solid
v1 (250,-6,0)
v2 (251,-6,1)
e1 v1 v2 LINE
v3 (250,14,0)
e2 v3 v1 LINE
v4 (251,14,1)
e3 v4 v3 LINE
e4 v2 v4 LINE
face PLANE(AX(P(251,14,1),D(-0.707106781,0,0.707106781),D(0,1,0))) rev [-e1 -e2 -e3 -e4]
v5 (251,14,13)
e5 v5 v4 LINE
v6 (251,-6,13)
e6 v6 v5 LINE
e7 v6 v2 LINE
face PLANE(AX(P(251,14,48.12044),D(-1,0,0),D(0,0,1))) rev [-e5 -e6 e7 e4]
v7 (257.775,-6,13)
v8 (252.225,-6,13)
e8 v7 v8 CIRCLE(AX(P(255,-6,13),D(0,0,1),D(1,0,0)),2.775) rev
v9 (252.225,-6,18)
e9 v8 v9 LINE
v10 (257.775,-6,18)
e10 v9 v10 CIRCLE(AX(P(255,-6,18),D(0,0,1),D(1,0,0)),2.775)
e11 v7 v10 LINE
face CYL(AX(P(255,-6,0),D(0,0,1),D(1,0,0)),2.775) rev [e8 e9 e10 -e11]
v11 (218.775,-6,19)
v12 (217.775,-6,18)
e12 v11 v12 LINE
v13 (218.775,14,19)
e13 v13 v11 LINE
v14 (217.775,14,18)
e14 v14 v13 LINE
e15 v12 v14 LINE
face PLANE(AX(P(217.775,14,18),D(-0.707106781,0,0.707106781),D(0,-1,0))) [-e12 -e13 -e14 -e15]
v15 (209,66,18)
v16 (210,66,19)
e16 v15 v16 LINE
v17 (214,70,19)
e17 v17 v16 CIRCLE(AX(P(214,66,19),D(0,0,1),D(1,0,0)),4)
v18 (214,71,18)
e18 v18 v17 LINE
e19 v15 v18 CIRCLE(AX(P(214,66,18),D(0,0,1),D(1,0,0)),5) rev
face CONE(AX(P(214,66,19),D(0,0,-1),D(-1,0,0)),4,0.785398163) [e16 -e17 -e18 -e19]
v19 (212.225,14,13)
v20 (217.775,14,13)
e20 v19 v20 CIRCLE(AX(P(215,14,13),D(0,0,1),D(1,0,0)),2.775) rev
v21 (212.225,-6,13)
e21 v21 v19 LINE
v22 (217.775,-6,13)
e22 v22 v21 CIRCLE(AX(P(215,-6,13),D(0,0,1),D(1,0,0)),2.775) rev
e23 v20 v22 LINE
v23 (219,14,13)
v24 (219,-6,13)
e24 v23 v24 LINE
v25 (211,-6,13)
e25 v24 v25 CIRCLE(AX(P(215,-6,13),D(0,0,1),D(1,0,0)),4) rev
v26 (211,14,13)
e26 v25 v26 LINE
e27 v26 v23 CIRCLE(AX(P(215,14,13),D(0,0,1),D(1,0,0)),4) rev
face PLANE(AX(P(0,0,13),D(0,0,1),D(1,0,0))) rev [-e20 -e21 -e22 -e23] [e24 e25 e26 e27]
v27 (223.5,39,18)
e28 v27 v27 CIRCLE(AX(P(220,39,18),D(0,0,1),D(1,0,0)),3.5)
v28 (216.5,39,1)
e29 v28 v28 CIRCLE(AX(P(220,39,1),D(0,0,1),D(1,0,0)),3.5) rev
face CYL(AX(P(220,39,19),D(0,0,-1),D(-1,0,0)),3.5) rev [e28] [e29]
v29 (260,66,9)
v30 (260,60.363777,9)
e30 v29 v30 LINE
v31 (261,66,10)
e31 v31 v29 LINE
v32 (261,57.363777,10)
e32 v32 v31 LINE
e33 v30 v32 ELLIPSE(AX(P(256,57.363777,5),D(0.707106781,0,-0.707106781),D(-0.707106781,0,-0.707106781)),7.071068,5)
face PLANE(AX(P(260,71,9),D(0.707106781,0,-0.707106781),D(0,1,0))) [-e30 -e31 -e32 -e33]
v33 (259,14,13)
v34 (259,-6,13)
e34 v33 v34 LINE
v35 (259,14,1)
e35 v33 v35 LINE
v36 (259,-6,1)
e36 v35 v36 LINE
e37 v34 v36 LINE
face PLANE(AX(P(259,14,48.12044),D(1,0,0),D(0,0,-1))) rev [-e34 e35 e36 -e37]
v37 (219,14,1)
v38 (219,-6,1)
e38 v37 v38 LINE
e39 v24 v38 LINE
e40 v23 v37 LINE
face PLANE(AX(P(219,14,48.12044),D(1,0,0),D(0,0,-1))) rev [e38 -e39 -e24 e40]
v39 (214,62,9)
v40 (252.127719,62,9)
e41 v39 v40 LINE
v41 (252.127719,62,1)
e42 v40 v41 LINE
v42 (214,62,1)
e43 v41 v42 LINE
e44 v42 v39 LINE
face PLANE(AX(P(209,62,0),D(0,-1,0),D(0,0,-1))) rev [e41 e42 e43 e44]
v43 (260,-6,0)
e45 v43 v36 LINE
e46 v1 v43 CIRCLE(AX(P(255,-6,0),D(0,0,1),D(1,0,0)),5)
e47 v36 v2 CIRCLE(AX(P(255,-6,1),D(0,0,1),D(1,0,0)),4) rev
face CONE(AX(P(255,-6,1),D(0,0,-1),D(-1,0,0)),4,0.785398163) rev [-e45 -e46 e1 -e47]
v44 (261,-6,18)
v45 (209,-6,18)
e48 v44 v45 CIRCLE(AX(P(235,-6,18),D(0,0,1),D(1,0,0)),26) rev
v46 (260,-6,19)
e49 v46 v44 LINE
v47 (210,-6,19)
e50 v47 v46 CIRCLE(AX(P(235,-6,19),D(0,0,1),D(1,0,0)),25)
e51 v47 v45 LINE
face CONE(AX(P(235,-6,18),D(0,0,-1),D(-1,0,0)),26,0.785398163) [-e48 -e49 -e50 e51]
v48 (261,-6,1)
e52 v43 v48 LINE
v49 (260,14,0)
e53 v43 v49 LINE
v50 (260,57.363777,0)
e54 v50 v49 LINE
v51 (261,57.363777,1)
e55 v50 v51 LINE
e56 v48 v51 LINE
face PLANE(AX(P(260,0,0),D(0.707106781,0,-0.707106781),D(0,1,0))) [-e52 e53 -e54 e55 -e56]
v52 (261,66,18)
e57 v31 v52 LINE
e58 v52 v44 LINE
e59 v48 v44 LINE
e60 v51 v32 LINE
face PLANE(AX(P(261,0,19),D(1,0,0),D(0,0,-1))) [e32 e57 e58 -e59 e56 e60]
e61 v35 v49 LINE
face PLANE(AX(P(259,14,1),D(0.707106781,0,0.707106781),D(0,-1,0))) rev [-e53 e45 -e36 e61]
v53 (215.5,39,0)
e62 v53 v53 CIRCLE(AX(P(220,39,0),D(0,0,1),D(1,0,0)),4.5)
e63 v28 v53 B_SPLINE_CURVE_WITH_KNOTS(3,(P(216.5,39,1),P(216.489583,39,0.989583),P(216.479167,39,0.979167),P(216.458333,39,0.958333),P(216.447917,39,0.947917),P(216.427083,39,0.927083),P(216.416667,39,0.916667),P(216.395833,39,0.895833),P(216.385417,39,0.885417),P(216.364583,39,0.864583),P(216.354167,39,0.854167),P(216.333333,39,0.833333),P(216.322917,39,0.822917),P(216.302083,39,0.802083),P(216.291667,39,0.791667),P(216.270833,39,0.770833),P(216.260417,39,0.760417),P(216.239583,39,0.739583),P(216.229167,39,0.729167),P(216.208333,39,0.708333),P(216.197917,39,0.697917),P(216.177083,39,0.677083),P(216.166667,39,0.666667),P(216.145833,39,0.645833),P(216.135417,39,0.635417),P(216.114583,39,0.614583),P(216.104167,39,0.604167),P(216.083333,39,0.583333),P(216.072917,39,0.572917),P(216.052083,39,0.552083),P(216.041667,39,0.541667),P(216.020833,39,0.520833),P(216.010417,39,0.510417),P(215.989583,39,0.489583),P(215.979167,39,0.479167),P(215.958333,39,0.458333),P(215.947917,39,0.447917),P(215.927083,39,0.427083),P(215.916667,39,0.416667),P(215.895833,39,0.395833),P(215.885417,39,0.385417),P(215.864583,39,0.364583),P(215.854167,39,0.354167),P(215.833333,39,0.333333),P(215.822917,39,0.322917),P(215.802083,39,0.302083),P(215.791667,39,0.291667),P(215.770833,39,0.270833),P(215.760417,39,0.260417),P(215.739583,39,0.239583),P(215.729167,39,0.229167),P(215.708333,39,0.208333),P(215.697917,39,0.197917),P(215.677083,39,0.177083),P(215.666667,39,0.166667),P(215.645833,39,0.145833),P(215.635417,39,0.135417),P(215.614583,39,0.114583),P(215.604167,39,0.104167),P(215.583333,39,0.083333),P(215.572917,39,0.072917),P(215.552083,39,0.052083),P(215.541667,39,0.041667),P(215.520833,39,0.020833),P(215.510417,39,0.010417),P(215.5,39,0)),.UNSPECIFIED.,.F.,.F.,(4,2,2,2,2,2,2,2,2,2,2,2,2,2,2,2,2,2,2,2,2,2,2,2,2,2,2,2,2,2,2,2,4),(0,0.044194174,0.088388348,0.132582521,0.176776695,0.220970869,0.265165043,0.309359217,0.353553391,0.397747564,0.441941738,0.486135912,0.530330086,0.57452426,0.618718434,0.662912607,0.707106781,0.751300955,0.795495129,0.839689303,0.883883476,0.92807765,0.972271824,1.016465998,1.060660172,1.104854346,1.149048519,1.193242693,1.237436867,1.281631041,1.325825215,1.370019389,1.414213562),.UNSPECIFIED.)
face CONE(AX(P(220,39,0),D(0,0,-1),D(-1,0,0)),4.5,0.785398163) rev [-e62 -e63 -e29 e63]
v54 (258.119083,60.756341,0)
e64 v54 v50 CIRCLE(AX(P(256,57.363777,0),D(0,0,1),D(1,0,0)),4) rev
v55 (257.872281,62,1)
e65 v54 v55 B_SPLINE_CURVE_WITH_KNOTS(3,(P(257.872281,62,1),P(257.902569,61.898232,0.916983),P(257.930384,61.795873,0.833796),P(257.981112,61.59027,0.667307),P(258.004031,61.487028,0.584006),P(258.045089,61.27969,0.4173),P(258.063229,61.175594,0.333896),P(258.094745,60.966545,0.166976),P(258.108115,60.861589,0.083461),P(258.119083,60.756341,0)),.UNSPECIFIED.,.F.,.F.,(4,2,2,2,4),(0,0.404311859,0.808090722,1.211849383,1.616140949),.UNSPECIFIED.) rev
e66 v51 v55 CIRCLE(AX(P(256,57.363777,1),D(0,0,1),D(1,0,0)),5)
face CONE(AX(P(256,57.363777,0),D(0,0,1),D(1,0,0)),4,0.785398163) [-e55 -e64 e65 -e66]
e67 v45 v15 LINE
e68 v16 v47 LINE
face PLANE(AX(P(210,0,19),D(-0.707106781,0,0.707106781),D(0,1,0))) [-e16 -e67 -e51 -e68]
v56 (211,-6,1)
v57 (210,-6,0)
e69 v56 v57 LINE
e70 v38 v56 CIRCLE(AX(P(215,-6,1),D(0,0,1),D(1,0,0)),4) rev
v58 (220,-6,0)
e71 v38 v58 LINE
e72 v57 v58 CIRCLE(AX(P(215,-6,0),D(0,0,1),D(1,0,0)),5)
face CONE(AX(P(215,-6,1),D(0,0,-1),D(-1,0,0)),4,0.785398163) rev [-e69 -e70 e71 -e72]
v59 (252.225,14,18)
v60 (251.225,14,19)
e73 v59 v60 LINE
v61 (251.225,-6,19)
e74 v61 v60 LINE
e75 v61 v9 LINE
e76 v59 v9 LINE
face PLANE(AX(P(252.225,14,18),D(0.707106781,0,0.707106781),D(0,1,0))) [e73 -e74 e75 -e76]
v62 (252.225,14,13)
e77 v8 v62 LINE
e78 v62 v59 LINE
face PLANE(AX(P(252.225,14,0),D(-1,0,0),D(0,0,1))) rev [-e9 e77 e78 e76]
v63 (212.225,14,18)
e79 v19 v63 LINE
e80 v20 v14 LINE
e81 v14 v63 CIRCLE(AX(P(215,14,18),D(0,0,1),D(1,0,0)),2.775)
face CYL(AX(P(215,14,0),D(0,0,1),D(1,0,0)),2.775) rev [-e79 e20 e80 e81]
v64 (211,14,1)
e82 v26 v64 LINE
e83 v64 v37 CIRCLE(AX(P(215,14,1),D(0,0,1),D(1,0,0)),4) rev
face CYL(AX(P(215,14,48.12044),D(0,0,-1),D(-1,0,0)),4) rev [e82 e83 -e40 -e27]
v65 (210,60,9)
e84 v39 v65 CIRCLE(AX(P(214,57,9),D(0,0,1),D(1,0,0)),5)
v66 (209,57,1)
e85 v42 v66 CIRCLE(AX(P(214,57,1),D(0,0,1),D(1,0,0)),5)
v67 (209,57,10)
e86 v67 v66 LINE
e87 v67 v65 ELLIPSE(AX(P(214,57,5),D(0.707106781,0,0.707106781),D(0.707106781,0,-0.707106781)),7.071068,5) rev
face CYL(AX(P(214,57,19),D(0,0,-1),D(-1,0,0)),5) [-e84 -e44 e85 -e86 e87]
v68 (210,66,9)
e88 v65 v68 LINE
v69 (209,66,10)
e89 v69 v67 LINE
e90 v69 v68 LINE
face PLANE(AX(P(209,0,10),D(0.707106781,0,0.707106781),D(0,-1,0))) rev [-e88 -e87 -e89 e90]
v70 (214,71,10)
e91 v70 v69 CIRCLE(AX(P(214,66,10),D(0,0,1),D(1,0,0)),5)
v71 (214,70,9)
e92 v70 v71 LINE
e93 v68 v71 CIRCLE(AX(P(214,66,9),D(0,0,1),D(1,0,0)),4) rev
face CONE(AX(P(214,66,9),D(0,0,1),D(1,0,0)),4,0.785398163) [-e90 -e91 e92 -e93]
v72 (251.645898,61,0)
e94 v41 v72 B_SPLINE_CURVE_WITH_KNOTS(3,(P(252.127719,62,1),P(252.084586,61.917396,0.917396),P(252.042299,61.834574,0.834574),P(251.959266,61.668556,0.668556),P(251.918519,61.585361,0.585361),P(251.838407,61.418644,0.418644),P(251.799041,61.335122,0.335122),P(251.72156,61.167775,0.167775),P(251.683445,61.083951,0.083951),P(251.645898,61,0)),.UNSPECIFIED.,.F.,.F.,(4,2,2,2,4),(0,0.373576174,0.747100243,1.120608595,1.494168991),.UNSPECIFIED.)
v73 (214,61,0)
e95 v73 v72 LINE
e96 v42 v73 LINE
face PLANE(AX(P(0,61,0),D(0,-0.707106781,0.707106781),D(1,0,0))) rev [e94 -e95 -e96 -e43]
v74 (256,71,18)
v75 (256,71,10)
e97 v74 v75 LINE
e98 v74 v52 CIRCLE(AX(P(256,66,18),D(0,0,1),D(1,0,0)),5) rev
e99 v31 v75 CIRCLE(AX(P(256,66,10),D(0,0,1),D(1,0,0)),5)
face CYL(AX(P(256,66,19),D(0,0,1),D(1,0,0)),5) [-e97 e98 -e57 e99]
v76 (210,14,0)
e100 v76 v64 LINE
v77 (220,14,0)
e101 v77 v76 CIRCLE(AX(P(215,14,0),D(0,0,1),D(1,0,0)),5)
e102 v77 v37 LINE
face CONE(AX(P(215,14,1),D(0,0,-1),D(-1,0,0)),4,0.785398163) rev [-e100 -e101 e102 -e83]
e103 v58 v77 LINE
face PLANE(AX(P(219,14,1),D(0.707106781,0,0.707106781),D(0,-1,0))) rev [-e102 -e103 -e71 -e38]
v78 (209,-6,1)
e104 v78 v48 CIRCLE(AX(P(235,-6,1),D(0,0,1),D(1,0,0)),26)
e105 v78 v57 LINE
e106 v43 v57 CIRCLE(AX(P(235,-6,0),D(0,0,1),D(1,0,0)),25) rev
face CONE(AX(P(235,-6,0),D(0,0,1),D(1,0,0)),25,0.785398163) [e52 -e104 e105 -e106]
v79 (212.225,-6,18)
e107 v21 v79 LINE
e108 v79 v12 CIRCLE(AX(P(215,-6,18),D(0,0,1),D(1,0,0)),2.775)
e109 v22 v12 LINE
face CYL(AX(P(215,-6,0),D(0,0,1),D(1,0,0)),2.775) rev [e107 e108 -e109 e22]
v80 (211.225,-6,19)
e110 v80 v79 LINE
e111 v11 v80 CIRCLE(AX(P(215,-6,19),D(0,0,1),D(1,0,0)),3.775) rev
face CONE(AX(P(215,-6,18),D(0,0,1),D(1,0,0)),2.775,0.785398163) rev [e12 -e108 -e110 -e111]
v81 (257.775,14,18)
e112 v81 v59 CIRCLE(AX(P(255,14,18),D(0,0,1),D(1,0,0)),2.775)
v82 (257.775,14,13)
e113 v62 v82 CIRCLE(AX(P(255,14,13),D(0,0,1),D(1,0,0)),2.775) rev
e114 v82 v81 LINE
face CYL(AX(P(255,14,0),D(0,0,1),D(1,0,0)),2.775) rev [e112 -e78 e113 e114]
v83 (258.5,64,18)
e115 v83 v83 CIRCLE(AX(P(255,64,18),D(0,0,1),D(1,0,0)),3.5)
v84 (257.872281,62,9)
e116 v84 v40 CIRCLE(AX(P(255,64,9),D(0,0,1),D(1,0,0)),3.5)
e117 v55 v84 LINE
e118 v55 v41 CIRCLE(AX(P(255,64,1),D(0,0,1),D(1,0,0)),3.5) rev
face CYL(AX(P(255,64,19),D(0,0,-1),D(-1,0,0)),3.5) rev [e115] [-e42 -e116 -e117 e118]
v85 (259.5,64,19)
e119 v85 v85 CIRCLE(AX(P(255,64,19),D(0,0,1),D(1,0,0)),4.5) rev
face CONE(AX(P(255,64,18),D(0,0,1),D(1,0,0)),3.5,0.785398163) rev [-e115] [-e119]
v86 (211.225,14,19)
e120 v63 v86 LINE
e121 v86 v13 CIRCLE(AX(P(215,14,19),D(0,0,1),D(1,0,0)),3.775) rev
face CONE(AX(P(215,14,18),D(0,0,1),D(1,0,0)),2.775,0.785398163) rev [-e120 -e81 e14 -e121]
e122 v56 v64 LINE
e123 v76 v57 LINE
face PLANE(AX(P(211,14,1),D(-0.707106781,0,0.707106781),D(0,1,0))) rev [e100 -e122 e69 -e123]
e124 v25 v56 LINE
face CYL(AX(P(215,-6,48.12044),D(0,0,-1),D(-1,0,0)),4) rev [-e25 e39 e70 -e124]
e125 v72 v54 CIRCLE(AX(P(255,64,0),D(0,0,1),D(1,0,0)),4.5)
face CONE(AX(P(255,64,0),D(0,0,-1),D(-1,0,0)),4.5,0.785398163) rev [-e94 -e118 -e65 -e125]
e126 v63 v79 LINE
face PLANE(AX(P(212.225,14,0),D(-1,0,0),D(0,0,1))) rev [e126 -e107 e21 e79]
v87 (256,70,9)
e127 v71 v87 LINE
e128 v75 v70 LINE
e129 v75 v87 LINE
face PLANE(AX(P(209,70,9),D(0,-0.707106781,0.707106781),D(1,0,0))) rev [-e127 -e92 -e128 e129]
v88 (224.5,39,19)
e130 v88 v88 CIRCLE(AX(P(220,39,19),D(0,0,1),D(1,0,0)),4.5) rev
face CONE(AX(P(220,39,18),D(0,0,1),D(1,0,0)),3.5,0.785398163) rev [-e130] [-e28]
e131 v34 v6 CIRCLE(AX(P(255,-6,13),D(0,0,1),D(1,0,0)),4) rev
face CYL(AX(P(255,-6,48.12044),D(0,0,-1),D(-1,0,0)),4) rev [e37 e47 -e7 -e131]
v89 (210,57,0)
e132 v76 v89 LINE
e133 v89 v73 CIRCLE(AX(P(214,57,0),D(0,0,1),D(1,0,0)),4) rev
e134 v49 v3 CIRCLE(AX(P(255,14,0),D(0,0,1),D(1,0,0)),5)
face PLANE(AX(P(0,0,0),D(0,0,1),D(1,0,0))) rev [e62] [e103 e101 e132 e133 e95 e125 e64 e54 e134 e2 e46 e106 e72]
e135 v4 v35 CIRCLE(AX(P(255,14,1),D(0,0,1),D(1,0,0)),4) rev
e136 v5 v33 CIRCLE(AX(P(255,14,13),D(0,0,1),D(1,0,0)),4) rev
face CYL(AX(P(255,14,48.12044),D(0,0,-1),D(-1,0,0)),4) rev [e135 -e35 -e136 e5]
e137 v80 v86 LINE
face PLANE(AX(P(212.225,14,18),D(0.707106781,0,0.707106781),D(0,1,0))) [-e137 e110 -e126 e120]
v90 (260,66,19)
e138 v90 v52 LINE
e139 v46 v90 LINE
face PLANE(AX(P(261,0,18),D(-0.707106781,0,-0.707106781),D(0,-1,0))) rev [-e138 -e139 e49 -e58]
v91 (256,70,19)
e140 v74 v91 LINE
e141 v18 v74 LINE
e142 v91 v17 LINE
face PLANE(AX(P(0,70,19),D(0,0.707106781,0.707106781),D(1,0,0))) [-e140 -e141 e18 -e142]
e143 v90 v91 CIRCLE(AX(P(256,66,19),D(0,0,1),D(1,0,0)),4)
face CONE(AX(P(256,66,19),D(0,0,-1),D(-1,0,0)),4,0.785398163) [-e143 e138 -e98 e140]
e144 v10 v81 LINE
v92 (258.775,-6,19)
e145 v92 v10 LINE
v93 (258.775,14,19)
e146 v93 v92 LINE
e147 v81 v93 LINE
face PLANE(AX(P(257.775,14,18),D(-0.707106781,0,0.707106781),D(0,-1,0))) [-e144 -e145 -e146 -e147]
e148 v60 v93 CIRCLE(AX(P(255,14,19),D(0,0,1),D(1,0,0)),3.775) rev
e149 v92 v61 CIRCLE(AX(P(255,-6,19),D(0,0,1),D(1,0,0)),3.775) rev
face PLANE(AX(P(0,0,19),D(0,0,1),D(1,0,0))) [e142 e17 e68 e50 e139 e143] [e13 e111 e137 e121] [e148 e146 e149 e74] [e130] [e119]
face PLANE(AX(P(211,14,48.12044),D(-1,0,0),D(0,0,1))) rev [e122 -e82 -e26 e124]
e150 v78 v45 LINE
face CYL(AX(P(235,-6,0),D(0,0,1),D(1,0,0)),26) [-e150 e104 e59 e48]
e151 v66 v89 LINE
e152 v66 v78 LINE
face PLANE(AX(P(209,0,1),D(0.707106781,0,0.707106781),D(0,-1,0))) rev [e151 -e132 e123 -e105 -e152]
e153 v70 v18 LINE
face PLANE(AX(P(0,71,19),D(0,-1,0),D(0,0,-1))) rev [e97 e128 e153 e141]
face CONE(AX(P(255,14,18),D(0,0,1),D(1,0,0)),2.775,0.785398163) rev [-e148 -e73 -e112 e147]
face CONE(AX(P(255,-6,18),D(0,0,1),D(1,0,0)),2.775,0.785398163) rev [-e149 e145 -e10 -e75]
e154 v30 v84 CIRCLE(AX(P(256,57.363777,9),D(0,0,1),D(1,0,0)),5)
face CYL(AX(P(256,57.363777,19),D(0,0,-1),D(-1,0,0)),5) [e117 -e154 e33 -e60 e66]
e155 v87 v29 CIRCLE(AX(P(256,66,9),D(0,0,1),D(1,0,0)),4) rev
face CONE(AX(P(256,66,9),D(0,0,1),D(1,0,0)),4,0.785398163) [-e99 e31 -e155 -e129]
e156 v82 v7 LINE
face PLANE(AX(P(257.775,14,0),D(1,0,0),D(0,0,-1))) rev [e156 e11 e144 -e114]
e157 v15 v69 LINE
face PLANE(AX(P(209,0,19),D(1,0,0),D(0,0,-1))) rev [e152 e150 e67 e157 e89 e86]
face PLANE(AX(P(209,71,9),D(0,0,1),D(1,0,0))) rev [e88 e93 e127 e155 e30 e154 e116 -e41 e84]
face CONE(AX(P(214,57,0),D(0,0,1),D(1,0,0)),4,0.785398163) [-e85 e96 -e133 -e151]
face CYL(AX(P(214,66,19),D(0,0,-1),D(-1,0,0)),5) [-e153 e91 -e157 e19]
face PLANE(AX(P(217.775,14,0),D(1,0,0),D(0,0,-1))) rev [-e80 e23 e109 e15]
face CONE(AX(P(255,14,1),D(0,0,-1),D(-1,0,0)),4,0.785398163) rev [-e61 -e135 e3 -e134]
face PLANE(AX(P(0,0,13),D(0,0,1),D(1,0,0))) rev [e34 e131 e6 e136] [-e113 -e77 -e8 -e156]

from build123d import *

# Parameters (mm, degrees)
SKETCH1_R           = 3.5
BOSS_EXTRUDE1_DEPTH = 19
CUT_EXTRUDE1_DEPTH  = 272.151249306
CUT_EXTRUDE2_DEPTH  = 272.151249306
CUT_EXTRUDE3_DEPTH  = 13
SKETCH5_W           = 9
SKETCH5_H           = 9
CUT_EXTRUDE4_DEPTH  = 91.033327163
FILLET1_R           = 5
CHAMFER1_SIZE       = 1


# Some blends are built 0.0001 mm under size
with BuildPart() as part:
    # Sketch1 → Boss-Extrude1 (new body)
    with BuildSketch(Plane.XY):
        Polygon((261, 71), (260, 71), (255, 71), (210, 71), (209, 71), (209, 41), (209, -59), (210, -59), (260, -59), (261, -59), align=None)
        with Locations((255, 64)):
            Circle(SKETCH1_R, mode=Mode.SUBTRACT)
        with Locations((220, 39)):
            Circle(SKETCH1_R, mode=Mode.SUBTRACT)
    extrude(amount=BOSS_EXTRUDE1_DEPTH)

    # Sketch2 → Cut-Extrude1 (cut, through all)
    with BuildSketch(Plane.XY.offset(19)):
        with BuildLine():
            Line((209, -59), (261, -59))
            Line((261, -59), (261, -6))
            ThreePointArc((261, -6), (235, -32), (209, -6))
            Line((209, -6), (209, -59))
        make_face()
    extrude(amount=-CUT_EXTRUDE1_DEPTH, mode=Mode.SUBTRACT)

    # Sketch3 → Cut-Extrude2 (cut, through all)
    with BuildSketch(Plane.XY.offset(19)):
        with BuildLine():
            Line((212.225, 14), (212.225, -6))
            ThreePointArc((212.225, -6), (215, -8.775), (217.775, -6))
            Line((217.775, -6), (217.775, 14))
            ThreePointArc((217.775, 14), (215, 16.775), (212.225, 14))
        make_face()
        with BuildLine():
            Line((252.225, 14), (252.225, -6))
            ThreePointArc((252.225, -6), (255, -8.775), (257.775, -6))
            Line((257.775, -6), (257.775, 14))
            ThreePointArc((257.775, 14), (255, 16.775), (252.225, 14))
        make_face()
    extrude(amount=-CUT_EXTRUDE2_DEPTH, mode=Mode.SUBTRACT)

    # Sketch4 → Cut-Extrude3 (cut)
    with BuildSketch(Plane(origin=(0, 0, 0), x_dir=(-1, 0, 0), z_dir=(0, 0, -1))):
        with BuildLine():
            Line((-251, 14), (-251, -6))
            ThreePointArc((-251, -6), (-255, -10), (-259, -6))
            Line((-259, -6), (-259, 14))
            ThreePointArc((-259, 14), (-255, 18), (-251, 14))
        make_face()
        with BuildLine():
            Line((-219, 14), (-219, -6))
            ThreePointArc((-219, -6), (-215, -10), (-211, -6))
            Line((-211, -6), (-211, 14))
            ThreePointArc((-211, 14), (-215, 18), (-219, 14))
        make_face()
    extrude(amount=-CUT_EXTRUDE3_DEPTH, mode=Mode.SUBTRACT)

    # Sketch5 → Cut-Extrude4 (cut, through all)
    with BuildSketch(Plane(origin=(261, 0, 0), x_dir=(0, 0, -1), z_dir=(1, 0, 0))):
        with Locations((-4.5, 66.5)):
            Rectangle(SKETCH5_W, SKETCH5_H)
    extrude(amount=-CUT_EXTRUDE4_DEPTH, mode=Mode.SUBTRACT)

    # Fillet1
    # the kernel refuses this fillet: 5 mm, written as the material it takes off along each edge
    with BuildSketch(Plane(origin=(209, 62, 9), x_dir=(0, -1, 0), z_dir=(0, 0, -1))) as fillet1_piece_1:
        with BuildLine():
            CenterArc((FILLET1_R, -FILLET1_R), FILLET1_R, 90, 90)
            Line((0, -FILLET1_R), (-FILLET1_R * 0.02, -FILLET1_R))
            Line((-FILLET1_R * 0.02, -FILLET1_R), (-FILLET1_R * 0.02, FILLET1_R * 0.02))
            Line((-FILLET1_R * 0.02, FILLET1_R * 0.02), (FILLET1_R, FILLET1_R * 0.02))
            Line((FILLET1_R, FILLET1_R * 0.02), (FILLET1_R, 0))
        make_face()
    extrude(amount=21.5, mode=Mode.SUBTRACT)
    with BuildSketch(Plane(origin=(261, 62, 9), x_dir=(0, -1, 0), z_dir=(0, 0, -1))) as fillet1_piece_2:
        with BuildLine():
            CenterArc((4.636222886, 5), FILLET1_R, 201.990710665, 68.009289335)
            Line((0, 3.127718677), (-0.092724458, 3.09027305))
            ThreePointArc((-0.092724458, 3.09027305), (-0.1, 1.563859338), (-0.1, 0))
            Line((-0.1, 0), (0, -0.1))
            Line((0, -0.1), (4.636222886, -0.1))
            Line((4.636222886, -0.1), (4.636222886, 0))
        make_face()
    extrude(amount=20.590557214, mode=Mode.SUBTRACT)
    with BuildSketch(Plane(origin=(209, 71, -3.5), x_dir=(1, 0, 0), z_dir=(0, 0, 1))) as fillet1_piece_3:
        with BuildLine():
            CenterArc((FILLET1_R, -FILLET1_R), FILLET1_R, 90, 90)
            Line((0, -FILLET1_R), (-FILLET1_R * 0.02, -FILLET1_R))
            Line((-FILLET1_R * 0.02, -FILLET1_R), (-FILLET1_R * 0.02, FILLET1_R * 0.02))
            Line((-FILLET1_R * 0.02, FILLET1_R * 0.02), (FILLET1_R, FILLET1_R * 0.02))
            Line((FILLET1_R, FILLET1_R * 0.02), (FILLET1_R, 0))
        make_face()
    extrude(amount=35, mode=Mode.SUBTRACT)
    with BuildSketch(Plane(origin=(261, 71, -3.5), x_dir=(-1, 0, 0), z_dir=(0, 0, 1))) as fillet1_piece_4:
        with BuildLine():
            CenterArc((FILLET1_R, FILLET1_R), FILLET1_R, 180, 90)
            Line((0, FILLET1_R), (-FILLET1_R * 0.02, FILLET1_R))
            Line((-FILLET1_R * 0.02, FILLET1_R), (-FILLET1_R * 0.02, -FILLET1_R * 0.02))
            Line((-FILLET1_R * 0.02, -FILLET1_R * 0.02), (FILLET1_R, -FILLET1_R * 0.02))
            Line((FILLET1_R, -FILLET1_R * 0.02), (FILLET1_R, 0))
        make_face()
    extrude(amount=35, mode=Mode.SUBTRACT)

    # Chamfer1
    chamfer1_edges = [part.edges().sort_by_distance(p)[0] for p in [
        (255, 60.5, 0),
        (216.5, 39, 0),
        (251.5, 64, 19),
        (209, 61.5, 9),
        (209, 25.5, 0),
        (209, 30, 19),
        (233.063859338, 62, 0),
        (261, 25.681888557, 0),
        (260.144961195, 60.160077651, 0),
        (210.464466094, 60.535533906, 0),
        (261, 61.681888557, 9),
        (261, 30, 19),
        (235, 71, 9),
        (259.535533906, 69.535533906, 9),
        (210.464466094, 69.535533906, 9),
        (235, 71, 19),
        (259.535533906, 69.535533906, 19),
        (210.464466094, 69.535533906, 19),
        (235, -32, 0),
        (235, -32, 19),
        (255, 16.775, 19),
        (252.225, 4, 19),
        (255, -8.775, 19),
        (257.775, 4, 19),
        (215, 16.775, 19),
        (212.225, 4, 19),
        (215, -8.775, 19),
        (217.775, 4, 19),
        (216.5, 39, 19),
        (255, 18, 0),
        (259, 4, 0),
        (255, -10, 0),
        (251, 4, 0),
        (215, 18, 0),
        (219, 4, 0),
        (215, -10, 0),
        (211, 4, 0),
    ]]
    chamfer(chamfer1_edges, length=CHAMFER1_SIZE - 0.0001)  # a hair under: the kernel refuses the full size


solid = part.part
